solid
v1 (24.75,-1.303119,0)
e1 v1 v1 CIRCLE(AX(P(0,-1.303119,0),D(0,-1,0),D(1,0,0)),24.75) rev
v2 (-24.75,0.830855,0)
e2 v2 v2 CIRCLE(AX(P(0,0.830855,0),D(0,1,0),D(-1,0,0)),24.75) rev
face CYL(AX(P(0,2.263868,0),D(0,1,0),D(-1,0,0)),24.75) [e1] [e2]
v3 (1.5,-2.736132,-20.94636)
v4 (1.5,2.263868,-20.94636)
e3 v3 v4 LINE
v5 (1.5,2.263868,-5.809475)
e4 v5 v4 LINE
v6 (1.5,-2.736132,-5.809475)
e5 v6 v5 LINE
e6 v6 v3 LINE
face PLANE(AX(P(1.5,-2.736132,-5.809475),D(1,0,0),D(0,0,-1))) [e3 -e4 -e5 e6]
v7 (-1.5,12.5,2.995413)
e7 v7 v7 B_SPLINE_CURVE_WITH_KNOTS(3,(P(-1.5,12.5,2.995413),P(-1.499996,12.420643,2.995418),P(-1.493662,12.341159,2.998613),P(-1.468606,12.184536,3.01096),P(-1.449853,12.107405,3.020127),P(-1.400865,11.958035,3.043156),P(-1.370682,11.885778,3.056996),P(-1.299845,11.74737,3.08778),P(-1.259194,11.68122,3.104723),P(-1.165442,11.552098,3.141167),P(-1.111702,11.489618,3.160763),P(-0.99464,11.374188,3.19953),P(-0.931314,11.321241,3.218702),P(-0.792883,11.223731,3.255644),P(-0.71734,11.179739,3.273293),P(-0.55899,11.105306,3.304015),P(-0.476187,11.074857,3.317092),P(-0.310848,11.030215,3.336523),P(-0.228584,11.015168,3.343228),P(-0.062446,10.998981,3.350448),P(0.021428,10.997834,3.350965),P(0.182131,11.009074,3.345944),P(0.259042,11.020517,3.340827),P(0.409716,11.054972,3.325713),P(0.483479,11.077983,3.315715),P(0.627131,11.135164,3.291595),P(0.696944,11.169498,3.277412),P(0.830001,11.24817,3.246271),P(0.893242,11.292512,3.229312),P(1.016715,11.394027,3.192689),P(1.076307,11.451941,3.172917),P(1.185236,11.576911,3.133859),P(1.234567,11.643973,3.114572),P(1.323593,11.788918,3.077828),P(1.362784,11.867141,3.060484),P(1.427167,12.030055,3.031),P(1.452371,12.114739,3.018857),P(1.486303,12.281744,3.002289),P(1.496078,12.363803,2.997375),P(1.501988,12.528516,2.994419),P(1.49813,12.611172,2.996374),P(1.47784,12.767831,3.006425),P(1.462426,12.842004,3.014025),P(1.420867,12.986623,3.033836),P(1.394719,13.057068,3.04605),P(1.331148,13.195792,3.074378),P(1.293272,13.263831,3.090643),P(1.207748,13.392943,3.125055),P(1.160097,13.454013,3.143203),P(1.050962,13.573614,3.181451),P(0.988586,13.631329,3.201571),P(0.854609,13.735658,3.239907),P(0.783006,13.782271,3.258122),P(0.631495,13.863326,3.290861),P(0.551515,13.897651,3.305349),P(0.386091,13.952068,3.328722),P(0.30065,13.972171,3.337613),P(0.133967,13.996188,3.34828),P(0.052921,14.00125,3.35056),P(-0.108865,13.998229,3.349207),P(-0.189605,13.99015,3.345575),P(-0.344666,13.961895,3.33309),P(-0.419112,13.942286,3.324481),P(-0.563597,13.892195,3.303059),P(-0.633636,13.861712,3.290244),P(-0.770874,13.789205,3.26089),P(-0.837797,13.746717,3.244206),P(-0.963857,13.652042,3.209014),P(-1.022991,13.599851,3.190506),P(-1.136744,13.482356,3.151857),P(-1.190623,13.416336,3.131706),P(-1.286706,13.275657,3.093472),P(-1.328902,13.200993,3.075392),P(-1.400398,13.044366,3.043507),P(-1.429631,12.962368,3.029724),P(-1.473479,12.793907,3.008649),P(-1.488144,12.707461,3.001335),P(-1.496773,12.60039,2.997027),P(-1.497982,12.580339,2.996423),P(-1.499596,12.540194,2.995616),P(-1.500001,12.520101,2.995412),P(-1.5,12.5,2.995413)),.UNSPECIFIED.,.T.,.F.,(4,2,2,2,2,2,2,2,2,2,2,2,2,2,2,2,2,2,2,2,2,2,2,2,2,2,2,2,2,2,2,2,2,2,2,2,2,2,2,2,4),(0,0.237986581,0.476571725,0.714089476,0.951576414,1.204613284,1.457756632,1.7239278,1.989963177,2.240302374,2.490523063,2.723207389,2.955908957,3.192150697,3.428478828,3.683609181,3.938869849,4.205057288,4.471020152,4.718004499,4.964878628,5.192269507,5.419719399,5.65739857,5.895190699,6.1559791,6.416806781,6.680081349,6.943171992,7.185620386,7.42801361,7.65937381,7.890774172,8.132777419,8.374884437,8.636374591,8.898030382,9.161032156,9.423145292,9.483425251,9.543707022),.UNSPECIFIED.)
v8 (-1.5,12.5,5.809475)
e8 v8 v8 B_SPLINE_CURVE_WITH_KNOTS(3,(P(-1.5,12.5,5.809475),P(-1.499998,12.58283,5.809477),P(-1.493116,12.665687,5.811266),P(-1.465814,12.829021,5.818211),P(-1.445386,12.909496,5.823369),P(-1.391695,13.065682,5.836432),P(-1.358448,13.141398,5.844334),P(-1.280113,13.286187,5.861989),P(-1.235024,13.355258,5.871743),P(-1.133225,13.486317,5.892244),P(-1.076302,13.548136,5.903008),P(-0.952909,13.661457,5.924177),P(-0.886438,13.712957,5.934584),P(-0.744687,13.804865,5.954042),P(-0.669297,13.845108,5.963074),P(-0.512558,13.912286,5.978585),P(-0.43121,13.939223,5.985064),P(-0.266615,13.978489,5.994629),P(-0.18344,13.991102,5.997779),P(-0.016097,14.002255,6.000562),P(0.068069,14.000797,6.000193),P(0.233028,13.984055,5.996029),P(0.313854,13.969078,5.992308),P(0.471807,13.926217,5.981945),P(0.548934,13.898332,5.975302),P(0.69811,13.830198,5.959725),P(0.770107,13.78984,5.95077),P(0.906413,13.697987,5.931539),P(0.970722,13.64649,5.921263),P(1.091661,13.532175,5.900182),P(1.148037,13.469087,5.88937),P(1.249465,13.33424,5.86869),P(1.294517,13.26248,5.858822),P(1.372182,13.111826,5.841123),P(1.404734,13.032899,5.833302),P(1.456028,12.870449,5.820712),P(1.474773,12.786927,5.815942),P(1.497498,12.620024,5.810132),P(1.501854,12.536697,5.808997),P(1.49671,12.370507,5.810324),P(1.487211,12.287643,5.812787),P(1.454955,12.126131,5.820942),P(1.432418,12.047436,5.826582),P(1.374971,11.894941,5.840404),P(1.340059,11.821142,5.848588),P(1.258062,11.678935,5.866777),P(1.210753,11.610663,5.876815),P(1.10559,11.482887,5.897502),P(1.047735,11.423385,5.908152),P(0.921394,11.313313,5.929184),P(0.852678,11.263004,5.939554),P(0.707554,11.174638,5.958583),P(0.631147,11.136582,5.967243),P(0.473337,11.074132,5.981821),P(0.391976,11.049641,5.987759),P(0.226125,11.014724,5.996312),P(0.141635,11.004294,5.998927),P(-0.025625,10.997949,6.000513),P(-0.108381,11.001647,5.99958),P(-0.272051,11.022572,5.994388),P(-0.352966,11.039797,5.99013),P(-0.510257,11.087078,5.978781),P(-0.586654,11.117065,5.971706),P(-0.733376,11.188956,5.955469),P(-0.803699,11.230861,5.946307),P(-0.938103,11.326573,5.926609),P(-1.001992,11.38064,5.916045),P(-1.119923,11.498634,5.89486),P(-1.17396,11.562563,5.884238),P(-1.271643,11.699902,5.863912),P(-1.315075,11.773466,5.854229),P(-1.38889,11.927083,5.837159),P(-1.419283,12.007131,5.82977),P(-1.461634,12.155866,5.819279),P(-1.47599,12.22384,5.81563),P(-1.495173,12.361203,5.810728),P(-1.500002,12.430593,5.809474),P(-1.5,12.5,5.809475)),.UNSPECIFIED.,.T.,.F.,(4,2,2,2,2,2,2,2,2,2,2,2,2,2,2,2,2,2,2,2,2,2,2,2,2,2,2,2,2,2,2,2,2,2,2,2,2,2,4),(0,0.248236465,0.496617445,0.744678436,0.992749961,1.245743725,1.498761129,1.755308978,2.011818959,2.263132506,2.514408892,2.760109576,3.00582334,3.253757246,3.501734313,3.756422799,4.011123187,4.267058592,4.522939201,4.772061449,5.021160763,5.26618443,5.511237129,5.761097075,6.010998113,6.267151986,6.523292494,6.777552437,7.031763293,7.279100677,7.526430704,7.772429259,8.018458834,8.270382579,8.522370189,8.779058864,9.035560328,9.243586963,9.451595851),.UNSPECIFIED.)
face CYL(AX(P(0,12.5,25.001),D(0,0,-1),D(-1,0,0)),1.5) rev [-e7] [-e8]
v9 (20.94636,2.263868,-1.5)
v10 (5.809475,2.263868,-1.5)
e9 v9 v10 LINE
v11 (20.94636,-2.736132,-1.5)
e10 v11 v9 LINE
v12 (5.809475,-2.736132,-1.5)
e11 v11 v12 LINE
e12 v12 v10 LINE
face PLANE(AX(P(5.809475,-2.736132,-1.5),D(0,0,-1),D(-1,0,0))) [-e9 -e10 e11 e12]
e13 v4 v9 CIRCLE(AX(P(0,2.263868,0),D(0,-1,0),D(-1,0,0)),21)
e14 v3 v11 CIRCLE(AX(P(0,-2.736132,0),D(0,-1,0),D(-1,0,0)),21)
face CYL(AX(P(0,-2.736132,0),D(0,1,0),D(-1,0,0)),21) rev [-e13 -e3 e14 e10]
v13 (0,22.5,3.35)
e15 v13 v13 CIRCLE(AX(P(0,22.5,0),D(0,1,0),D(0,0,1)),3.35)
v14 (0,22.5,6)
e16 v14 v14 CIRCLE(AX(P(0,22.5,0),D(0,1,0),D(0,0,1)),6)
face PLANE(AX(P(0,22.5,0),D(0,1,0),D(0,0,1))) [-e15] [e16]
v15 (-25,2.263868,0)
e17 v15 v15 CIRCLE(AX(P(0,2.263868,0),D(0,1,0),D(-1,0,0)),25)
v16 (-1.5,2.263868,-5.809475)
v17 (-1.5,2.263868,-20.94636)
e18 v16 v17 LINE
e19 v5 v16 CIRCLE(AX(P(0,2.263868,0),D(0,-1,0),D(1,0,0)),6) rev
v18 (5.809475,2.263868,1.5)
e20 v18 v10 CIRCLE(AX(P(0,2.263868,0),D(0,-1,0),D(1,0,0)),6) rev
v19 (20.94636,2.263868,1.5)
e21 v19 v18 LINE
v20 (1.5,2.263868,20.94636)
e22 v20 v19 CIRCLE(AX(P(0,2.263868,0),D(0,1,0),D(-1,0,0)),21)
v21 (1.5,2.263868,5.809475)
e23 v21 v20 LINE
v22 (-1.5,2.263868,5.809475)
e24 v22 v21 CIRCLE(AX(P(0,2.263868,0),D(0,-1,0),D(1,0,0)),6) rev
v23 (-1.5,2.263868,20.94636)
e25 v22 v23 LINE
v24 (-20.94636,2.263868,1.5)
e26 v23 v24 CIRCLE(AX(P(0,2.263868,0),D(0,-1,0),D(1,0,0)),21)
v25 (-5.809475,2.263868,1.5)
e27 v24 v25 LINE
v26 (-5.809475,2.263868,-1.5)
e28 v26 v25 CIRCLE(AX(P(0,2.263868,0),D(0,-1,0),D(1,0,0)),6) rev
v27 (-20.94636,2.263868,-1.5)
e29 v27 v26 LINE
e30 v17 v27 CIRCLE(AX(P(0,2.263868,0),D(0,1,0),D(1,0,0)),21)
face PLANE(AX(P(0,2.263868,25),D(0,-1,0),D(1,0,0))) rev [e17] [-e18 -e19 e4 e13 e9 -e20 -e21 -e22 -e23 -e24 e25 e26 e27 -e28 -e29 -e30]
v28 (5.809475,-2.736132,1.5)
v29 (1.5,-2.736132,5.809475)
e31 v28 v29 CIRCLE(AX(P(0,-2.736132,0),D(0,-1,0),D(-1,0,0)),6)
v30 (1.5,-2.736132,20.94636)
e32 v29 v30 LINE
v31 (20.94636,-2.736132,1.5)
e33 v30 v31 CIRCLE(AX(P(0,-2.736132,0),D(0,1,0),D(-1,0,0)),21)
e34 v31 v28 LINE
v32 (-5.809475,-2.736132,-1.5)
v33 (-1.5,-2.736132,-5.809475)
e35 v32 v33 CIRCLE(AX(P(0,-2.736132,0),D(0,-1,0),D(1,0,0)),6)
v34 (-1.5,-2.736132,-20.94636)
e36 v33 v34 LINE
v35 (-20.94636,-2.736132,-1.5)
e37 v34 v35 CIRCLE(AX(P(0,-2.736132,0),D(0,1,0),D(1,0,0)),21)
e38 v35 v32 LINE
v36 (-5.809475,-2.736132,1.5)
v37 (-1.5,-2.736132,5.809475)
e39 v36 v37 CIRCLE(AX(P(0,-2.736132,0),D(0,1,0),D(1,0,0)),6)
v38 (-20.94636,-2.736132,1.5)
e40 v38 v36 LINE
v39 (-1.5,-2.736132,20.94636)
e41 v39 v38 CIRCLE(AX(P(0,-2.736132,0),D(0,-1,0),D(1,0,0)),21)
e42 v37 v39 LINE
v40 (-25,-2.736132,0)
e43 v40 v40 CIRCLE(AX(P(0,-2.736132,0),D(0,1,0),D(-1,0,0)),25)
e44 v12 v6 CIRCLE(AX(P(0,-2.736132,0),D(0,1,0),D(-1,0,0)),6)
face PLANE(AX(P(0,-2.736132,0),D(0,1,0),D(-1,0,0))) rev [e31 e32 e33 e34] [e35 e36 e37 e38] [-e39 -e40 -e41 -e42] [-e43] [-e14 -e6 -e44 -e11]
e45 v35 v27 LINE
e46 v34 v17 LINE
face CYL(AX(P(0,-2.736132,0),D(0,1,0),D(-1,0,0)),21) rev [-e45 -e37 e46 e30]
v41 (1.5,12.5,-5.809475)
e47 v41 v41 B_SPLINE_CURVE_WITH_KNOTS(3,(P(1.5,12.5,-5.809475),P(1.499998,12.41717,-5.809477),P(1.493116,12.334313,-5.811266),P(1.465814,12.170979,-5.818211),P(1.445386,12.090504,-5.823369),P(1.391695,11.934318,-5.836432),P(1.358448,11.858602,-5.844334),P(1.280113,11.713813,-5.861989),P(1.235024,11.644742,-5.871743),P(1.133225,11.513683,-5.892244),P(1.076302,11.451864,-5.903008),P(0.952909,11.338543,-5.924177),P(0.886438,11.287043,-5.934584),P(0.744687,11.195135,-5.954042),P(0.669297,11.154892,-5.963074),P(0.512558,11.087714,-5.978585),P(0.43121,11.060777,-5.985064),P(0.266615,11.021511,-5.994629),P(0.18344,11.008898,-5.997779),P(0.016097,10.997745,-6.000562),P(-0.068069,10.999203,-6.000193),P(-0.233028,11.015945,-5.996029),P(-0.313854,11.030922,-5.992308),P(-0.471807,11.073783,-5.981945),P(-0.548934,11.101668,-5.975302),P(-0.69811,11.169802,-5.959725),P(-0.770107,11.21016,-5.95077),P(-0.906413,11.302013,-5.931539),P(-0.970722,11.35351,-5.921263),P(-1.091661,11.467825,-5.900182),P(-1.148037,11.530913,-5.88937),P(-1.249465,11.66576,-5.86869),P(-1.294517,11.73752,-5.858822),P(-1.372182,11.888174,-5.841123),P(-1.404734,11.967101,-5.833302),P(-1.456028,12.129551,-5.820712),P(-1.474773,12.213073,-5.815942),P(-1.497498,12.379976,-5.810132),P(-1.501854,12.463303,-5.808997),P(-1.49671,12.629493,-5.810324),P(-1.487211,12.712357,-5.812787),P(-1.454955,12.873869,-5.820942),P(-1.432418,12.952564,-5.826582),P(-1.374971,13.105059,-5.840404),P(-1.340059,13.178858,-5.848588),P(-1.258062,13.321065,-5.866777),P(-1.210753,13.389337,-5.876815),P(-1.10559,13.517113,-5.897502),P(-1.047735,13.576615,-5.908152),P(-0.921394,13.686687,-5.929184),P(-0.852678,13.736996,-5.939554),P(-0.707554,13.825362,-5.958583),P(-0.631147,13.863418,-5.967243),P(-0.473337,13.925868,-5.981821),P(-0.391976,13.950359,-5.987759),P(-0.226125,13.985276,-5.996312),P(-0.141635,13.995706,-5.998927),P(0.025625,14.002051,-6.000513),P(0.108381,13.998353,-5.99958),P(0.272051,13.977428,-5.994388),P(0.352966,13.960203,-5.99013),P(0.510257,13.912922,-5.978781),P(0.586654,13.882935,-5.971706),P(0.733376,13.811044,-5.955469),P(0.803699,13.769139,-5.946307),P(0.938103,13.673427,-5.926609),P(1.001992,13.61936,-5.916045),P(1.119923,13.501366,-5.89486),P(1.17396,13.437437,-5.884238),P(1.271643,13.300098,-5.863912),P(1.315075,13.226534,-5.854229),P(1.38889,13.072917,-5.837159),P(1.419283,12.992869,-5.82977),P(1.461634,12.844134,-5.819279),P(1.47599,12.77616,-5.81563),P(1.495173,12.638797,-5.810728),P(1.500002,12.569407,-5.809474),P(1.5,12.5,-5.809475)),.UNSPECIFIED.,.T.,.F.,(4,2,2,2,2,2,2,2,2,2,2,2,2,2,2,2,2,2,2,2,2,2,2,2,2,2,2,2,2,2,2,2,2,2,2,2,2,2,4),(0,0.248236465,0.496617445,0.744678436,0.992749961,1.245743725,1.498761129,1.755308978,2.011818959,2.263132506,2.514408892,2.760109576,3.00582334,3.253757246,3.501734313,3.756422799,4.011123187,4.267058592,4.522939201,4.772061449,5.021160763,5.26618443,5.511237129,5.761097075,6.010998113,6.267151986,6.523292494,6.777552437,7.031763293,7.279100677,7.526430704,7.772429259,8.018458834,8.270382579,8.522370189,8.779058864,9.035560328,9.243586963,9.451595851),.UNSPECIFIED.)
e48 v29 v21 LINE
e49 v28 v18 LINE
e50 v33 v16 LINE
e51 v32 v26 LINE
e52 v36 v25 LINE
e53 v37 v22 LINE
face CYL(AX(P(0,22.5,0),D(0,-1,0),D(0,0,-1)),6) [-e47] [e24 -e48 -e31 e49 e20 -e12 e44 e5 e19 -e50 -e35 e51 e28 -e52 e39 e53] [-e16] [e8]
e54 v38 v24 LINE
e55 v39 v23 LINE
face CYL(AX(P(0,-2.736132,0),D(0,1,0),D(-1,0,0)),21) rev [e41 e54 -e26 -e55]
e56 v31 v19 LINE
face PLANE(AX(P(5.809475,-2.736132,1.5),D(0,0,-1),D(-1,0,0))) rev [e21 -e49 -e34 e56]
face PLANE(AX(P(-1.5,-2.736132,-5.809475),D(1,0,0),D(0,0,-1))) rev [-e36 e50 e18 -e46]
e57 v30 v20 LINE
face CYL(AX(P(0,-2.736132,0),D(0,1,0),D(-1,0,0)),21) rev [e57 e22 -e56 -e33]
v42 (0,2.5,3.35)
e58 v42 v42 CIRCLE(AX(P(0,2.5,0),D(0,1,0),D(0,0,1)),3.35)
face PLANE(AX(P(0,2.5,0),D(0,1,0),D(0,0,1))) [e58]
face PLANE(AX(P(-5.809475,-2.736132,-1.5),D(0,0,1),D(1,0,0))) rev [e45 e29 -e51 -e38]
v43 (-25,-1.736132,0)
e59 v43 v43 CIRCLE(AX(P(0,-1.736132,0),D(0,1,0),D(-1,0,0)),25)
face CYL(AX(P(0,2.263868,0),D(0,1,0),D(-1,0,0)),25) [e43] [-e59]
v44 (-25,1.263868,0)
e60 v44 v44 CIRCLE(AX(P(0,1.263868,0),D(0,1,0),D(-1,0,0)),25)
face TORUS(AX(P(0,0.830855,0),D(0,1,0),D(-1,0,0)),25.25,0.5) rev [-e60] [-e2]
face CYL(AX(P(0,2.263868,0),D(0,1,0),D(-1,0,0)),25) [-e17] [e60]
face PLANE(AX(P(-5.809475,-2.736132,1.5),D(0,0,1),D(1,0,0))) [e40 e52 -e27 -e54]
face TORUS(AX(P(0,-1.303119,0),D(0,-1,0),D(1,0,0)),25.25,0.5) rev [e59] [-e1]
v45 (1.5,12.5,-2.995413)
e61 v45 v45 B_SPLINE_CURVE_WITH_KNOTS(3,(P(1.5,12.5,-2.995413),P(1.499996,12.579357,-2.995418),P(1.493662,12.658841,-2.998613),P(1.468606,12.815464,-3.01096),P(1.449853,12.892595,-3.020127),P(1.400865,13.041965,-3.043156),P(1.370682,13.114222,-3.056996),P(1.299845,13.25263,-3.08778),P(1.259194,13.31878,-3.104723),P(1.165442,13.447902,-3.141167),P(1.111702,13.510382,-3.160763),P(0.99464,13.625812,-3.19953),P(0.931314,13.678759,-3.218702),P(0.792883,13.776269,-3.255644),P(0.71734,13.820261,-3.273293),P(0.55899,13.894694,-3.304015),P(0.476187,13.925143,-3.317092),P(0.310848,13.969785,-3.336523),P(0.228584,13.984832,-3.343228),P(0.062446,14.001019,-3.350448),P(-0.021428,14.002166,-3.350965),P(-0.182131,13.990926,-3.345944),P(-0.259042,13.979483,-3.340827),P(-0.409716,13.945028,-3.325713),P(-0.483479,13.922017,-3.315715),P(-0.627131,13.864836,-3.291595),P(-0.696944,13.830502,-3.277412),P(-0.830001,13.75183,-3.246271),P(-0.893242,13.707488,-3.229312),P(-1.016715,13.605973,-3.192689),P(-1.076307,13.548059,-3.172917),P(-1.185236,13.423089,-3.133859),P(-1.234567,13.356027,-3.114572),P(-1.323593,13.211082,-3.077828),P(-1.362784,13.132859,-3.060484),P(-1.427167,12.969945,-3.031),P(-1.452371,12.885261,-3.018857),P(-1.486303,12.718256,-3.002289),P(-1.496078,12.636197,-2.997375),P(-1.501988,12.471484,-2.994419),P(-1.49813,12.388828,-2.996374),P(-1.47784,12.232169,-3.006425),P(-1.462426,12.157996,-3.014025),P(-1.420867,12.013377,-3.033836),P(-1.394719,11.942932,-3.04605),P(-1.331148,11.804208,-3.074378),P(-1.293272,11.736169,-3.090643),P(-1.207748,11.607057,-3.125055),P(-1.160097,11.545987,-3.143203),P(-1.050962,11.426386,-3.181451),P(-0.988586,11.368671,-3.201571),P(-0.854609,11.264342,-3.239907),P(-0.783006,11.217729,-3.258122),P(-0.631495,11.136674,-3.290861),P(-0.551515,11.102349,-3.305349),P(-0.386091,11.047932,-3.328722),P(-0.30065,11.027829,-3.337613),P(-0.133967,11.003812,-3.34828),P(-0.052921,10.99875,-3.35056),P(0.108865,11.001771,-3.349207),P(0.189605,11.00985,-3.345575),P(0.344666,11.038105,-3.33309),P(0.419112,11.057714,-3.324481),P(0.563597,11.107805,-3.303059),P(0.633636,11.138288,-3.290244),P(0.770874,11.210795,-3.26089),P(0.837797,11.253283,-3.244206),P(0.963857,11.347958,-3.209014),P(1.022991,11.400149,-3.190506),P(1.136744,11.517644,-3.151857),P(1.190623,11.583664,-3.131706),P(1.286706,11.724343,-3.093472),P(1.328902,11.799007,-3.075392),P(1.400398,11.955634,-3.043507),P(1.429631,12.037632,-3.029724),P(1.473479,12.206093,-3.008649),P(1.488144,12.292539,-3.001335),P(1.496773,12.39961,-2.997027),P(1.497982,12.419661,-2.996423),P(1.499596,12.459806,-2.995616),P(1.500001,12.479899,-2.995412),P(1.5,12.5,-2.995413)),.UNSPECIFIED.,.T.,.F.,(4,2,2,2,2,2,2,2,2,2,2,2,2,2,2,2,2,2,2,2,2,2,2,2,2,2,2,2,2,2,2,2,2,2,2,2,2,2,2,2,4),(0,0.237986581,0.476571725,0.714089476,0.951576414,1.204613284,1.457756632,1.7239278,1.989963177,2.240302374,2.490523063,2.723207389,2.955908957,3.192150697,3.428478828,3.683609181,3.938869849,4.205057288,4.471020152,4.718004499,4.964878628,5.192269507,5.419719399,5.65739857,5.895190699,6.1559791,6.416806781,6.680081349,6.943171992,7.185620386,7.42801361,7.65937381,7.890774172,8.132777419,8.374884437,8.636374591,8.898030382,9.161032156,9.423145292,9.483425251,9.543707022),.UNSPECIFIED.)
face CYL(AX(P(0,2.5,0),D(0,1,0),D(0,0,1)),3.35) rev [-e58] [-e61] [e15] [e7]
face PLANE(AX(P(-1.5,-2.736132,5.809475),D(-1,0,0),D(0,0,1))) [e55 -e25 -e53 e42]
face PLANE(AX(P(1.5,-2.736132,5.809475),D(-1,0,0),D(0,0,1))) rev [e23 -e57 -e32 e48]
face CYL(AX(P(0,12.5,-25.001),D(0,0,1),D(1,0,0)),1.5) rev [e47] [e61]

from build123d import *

# Parameters (mm, degrees)
REVOLVE1_ANGLE                 = 90.0000000000002
BOSS_EXTRUDE2_DEPTH            = 22.5
CUT_EXTRUDE1_DEPTH             = 41.736973886583954
MIRROR3_START                  = -2.736132077
MIRROR3_DEPTH                  = 5
MIRROR3_START_2                = 2.263867923
MIRROR3_2_DEPTH                = 20.236132077
MIRROR3_3_DEPTH                = 1
MIRROR3_START_3                = 1.263867923
MIRROR3_4_DEPTH                = 1
MIRROR4_START                  = -2.736132077
MIRROR4_DEPTH                  = 5
MIRROR4_START_2                = 2.263867923
MIRROR4_2_DEPTH                = 20.236132077
MIRROR4_3_DEPTH                = 1
MIRROR4_START_3                = 1.263867923
MIRROR4_4_DEPTH                = 1
SKETCH7_R                      = 3.35
CUT_EXTRUDE2_DEPTH             = 20
FILLET9_R                      = 0.5
CUT_EXTRUDE3_REACH             = 43.908
SKETCH8_R                      = 1.5000000000000004
CUT_EXTRUDE3_DIRECTION_2_REACH = 43.908


# Read off the part's stored shape, not the designer's step: Mirror3, Mirror4
with BuildPart() as part:
    # Sketch1 → Revolve1 (revolve)
    with BuildSketch(Plane.XY):
        Polygon((0, 2.2638679230386933), (0, -2.7361320769613027), (25, -2.7361320769613027), (25.000000000000007, -1.736132076961303), (24.750000000000007, -1.736132076961303), (24.75, 1.2638679230386973), (25, 1.2638679230386973), (25, 2.2638679230386973), align=None)
    revolve(axis=Axis((0, 2.2638679230386933, 0), (0, -1, 0)), revolution_arc=REVOLVE1_ANGLE)

    # Sketch2 → Boss-Extrude2 (add)
    with BuildSketch(Plane(origin=(0, 0, 0), x_dir=(1, 0, 0), z_dir=(0, 1, 0))):
        with BuildLine():
            Line((0, 0), (6, 0))
            ThreePointArc((6, 0), (4.242640687119239, -4.242640687119332), (-1.3093e-13, -6))
            Line((-1.3093e-13, -6), (0, 0))
        make_face()
    extrude(amount=BOSS_EXTRUDE2_DEPTH)

    # Sketch6 → Cut-Extrude1 (cut, through all)
    with BuildSketch(Plane(origin=(0, 2.263867923038695, 0), x_dir=(1, 0, 0), z_dir=(0, 1, 0))):
        with BuildLine():
            Line((1.4999999999999127, -5.809475019311148), (1.4999999999999145, -20.946360065653423))
            ThreePointArc((1.4999999999999145, -20.946360065653423), (14.849242404917469, -14.849242404917533), (20.946360065653415, -1.5))
            Line((20.946360065653415, -1.5), (5.809475019311125, -1.5))
            ThreePointArc((5.809475019311125, -1.5), (4.242640687119254, -4.242640687119317), (1.4999999999999127, -5.809475019311148))
        make_face()
    extrude(amount=-CUT_EXTRUDE1_DEPTH, mode=Mode.SUBTRACT)

    # Mirror3 outline → Mirror3 (add)
    with BuildSketch(Plane(origin=(0, 0, 0), x_dir=(1, 0, 0), z_dir=(0, 1, 0)).offset(MIRROR3_START)):
        with BuildLine():
            ThreePointArc((24.75, 0), (17.500892834, 17.500892834), (0, 24.75))
            Line((0, 24.75), (0, 0))
            Line((0, 0), (24.75, 0))
        make_face()
        with BuildLine():
            Line((20.946360066, 1.5), (5.809475019, 1.5))
            ThreePointArc((5.809475019, 1.5), (4.242640687, 4.242640687), (1.5, 5.809475019))
            Line((1.5, 5.809475019), (1.5, 20.946360066))
            ThreePointArc((1.5, 20.946360066), (14.849242405, 14.849242405), (20.946360066, 1.5))
        make_face(mode=Mode.SUBTRACT)
    extrude(amount=MIRROR3_DEPTH)

    # Mirror3 2 outline → Mirror3 2 (add)
    with BuildSketch(Plane(origin=(0, 0, 0), x_dir=(1, 0, 0), z_dir=(0, 1, 0)).offset(MIRROR3_START_2)):
        with BuildLine():
            Line((0, 0), (6, 0))
            ThreePointArc((6, 0), (4.242640687, 4.242640687), (0, 6))
            Line((0, 6), (0, 0))
        make_face()
    extrude(amount=MIRROR3_2_DEPTH)

    # Mirror3 3 outline → Mirror3 3 (add)
    with BuildSketch(Plane(origin=(0, 0, 0), x_dir=(1, 0, 0), z_dir=(0, 1, 0)).offset(MIRROR3_START)):
        with BuildLine():
            Line((24.75, 0), (25, 0))
            ThreePointArc((25, 0), (17.67766953, 17.67766953), (0, 25))
            Line((0, 25), (0, 24.75))
            ThreePointArc((0, 24.75), (17.500892834, 17.500892834), (24.75, 0))
        make_face()
    extrude(amount=MIRROR3_3_DEPTH)

    # Mirror3 4 outline → Mirror3 4 (add)
    with BuildSketch(Plane(origin=(0, 0, 0), x_dir=(1, 0, 0), z_dir=(0, 1, 0)).offset(MIRROR3_START_3)):
        with BuildLine():
            Line((24.75, 0), (25, 0))
            ThreePointArc((25, 0), (17.67766953, 17.67766953), (0, 25))
            Line((0, 25), (0, 24.75))
            ThreePointArc((0, 24.75), (17.500892834, 17.500892834), (24.75, 0))
        make_face()
    extrude(amount=MIRROR3_4_DEPTH)

    # Mirror4 outline → Mirror4 (add)
    with BuildSketch(Plane(origin=(0, 0, 0), x_dir=(1, 0, 0), z_dir=(0, 1, 0)).offset(MIRROR4_START)):
        with BuildLine():
            ThreePointArc((0, 24.75), (-24.75, 0), (0, -24.75))
            Line((0, -24.75), (0, 24.75))
        make_face()
        with BuildLine():
            Line((-1.5, 20.946360066), (-1.5, 5.809475019))
            ThreePointArc((-1.5, 5.809475019), (-4.242640687, 4.242640687), (-5.809475019, 1.5))
            Line((-5.809475019, 1.5), (-20.946360066, 1.5))
            ThreePointArc((-20.946360066, 1.5), (-14.849242405, 14.849242405), (-1.5, 20.946360066))
        make_face(mode=Mode.SUBTRACT)
        with BuildLine():
            Line((-20.946360066, -1.5), (-5.809475019, -1.5))
            ThreePointArc((-5.809475019, -1.5), (-4.242640687, -4.242640687), (-1.5, -5.809475019))
            Line((-1.5, -5.809475019), (-1.5, -20.946360066))
            ThreePointArc((-1.5, -20.946360066), (-14.849242405, -14.849242405), (-20.946360066, -1.5))
        make_face(mode=Mode.SUBTRACT)
    extrude(amount=MIRROR4_DEPTH)

    # Mirror4 2 outline → Mirror4 2 (add)
    with BuildSketch(Plane(origin=(0, 0, 0), x_dir=(1, 0, 0), z_dir=(0, 1, 0)).offset(MIRROR4_START_2)):
        with BuildLine():
            Line((0, -6), (0, 6))
            ThreePointArc((0, 6), (-6, 0), (0, -6))
        make_face()
    extrude(amount=MIRROR4_2_DEPTH)

    # Mirror4 3 outline → Mirror4 3 (add)
    with BuildSketch(Plane(origin=(0, 0, 0), x_dir=(1, 0, 0), z_dir=(0, 1, 0)).offset(MIRROR4_START)):
        with BuildLine():
            Line((0, 24.75), (0, 25))
            ThreePointArc((0, 25), (-25, 0), (0, -25))
            Line((0, -25), (0, -24.75))
            ThreePointArc((0, -24.75), (-24.75, 0), (0, 24.75))
        make_face()
    extrude(amount=MIRROR4_3_DEPTH)

    # Mirror4 4 outline → Mirror4 4 (add)
    with BuildSketch(Plane(origin=(0, 0, 0), x_dir=(1, 0, 0), z_dir=(0, 1, 0)).offset(MIRROR4_START_3)):
        with BuildLine():
            Line((0, 24.75), (0, 25))
            ThreePointArc((0, 25), (-25, 0), (0, -25))
            Line((0, -25), (0, -24.75))
            ThreePointArc((0, -24.75), (-24.75, 0), (0, 24.75))
        make_face()
    extrude(amount=MIRROR4_4_DEPTH)

    # Sketch7 → Cut-Extrude2 (cut)
    with BuildSketch(Plane(origin=(0, 22.5, 0), x_dir=(1, 0, 0), z_dir=(0, 1, 0))):
        with Locations(Location((0, 0, 0), (0, 0, 270))):
            Circle(SKETCH7_R)
    extrude(amount=-CUT_EXTRUDE2_DEPTH, mode=Mode.SUBTRACT)

    # Fillet9
    # the kernel refuses this fillet: 0.5 mm, written as the material it adds along each edge
    with BuildSketch(Plane(origin=(3.55e-15, 1.263867923, 0), x_dir=(-1.4e-16, 0, 1), z_dir=(1, 0, 1.4e-16))) as fillet9_piece_1:
        with BuildLine():
            CenterArc((25.25, 0.4330127018922456), FILLET9_R, 180, 60.000000000001876)
            Line((25.000000000000014, 1.821e-14), (24.995000000000015, -0.00866025403782644))
            ThreePointArc((24.995000000000015, -0.00866025403782644), (24.875000000000007, -0.01000000000000001), (24.75, -0.01000000000000001))
            Line((24.75, -0.01000000000000001), (24.74, 0))
            Line((24.74, 0), (24.74, 0.4330127018922456))
            Line((24.74, 0.4330127018922456), (24.75, 0.4330127018922456))
        make_face()
    revolve(axis=Axis((3.55e-15, 1.263867923, 0), (0, -1, 0)), revolution_arc=179.99999999999997)
    with BuildSketch(Plane(origin=(3.55e-15, -1.7361320770000002, 0), x_dir=(-1.4e-16, 0, 1), z_dir=(1, 0, 1.4e-16))) as fillet9_piece_2:
        with BuildLine():
            CenterArc((25.25, -0.4330127018922456), FILLET9_R, 119.99999999999814, 60.00000000000186)
            Line((24.75, -0.4330127018922456), (24.74, -0.4330127018922456))
            Line((24.74, -0.4330127018922456), (24.74, 0))
            Line((24.74, 0), (24.75, 0.01000000000000001))
            ThreePointArc((24.75, 0.01000000000000001), (24.875000000000007, 0.01000000000000001), (24.995000000000015, 0.00866025403782644))
            Line((24.995000000000015, 0.00866025403782644), (25.000000000000014, -1.821e-14))
        make_face()
    revolve(axis=Axis((3.55e-15, -1.7361320770000002, 0), (0, -1, 0)), revolution_arc=179.99999999999997)
    with BuildSketch(Plane(origin=(0, -1.7361320769613031, 0), x_dir=(1, 0, 0), z_dir=(0, 0, -1))) as fillet9_piece_3:
        with BuildLine():
            CenterArc((25.250000000000007, -0.4330127018922436), FILLET9_R, 119.9999999999986, 60.00000000000141)
            Line((24.750000000000007, -0.4330127018922436), (24.740000000000006, -0.4330127018922436))
            Line((24.740000000000006, -0.4330127018922436), (24.740000000000006, 0))
            Line((24.740000000000006, 0), (24.750000000000007, 0.01000000000000001))
            ThreePointArc((24.750000000000007, 0.01000000000000001), (24.875000000000014, 0.01000000000000001), (24.99500000000002, 0.00866025403782622))
            Line((24.99500000000002, 0.00866025403782622), (25.000000000000018, -1.821e-14))
        make_face()
    revolve(axis=Axis((0, -1.7361320769613031, 0), (0, -1, 0)), revolution_arc=90.0000000000002)
    with BuildSketch(Plane(origin=(-1.25320021e-09, -1.7361320770000002, 1.25320021e-09), x_dir=(5.063435192760357e-11, 0, -1.0), z_dir=(-1.0, 0, -5.063435192760357e-11))) as fillet9_piece_4:
        with BuildLine():
            CenterArc((25.2500000012532, -0.4330127018922456), FILLET9_R, 119.99999999999814, 60.00000000000186)
            Line((24.7500000012532, -0.4330127018922456), (24.7400000012532, -0.4330127018922456))
            Line((24.7400000012532, -0.4330127018922456), (24.7400000012532, 0))
            Line((24.7400000012532, 0), (24.7500000012532, 0.01000000000000001))
            ThreePointArc((24.7500000012532, 0.01000000000000001), (24.875000001253206, 0.01000000000000001), (24.995000001253217, 0.00866025403782644))
            Line((24.995000001253217, 0.00866025403782644), (25.000000001253213, -1.821e-14))
        make_face()
    revolve(axis=Axis((-1.25320021e-09, -1.7361320770000002, 1.25320021e-09), (0, -1, 0)), revolution_arc=89.99999999419774)
    with BuildSketch(Plane(origin=(0, 1.2638679230386973, 0), x_dir=(1, 0, 0), z_dir=(0, 0, -1))) as fillet9_piece_5:
        with BuildLine():
            CenterArc((25.250000000000007, 0.4330127018922396), FILLET9_R, 180, 60.000000000000455)
            Line((25.00000000000001, 1.821e-14), (24.99500000000001, -0.00866025403782622))
            ThreePointArc((24.99500000000001, -0.00866025403782622), (24.875000000000007, -0.01000000000000001), (24.75, -0.01000000000000001))
            Line((24.75, -0.01000000000000001), (24.74, 0))
            Line((24.74, 0), (24.740000000000006, 0.4330127018922396))
            Line((24.740000000000006, 0.4330127018922396), (24.750000000000007, 0.4330127018922396))
        make_face()
    revolve(axis=Axis((0, 1.2638679230386973, 0), (0, -1, 0)), revolution_arc=90.0000000000002)
    with BuildSketch(Plane(origin=(-1.25320021e-09, 1.263867923, 1.25320021e-09), x_dir=(5.063435192760357e-11, 0, -1.0), z_dir=(-1.0, 0, -5.063435192760357e-11))) as fillet9_piece_6:
        with BuildLine():
            CenterArc((25.2500000012532, 0.4330127018922456), FILLET9_R, 180, 60.000000000001876)
            Line((25.000000001253213, 1.821e-14), (24.995000001253217, -0.00866025403782644))
            ThreePointArc((24.995000001253217, -0.00866025403782644), (24.875000001253206, -0.01000000000000001), (24.7500000012532, -0.01000000000000001))
            Line((24.7500000012532, -0.01000000000000001), (24.7400000012532, 0))
            Line((24.7400000012532, 0), (24.7400000012532, 0.4330127018922456))
            Line((24.7400000012532, 0.4330127018922456), (24.7500000012532, 0.4330127018922456))
        make_face()
    revolve(axis=Axis((-1.25320021e-09, 1.263867923, 1.25320021e-09), (0, -1, 0)), revolution_arc=89.99999999419774)

    # Sketch8 → Cut-Extrude3 (cut, up to next)
    with BuildSketch(Plane.XY, mode=Mode.PRIVATE) as cut_extrude3_sk1:
        with Locations(Location((1.22e-15, 12.499999999999998, 0), (0, 0, 180))):
            Circle(SKETCH8_R)
    cut_extrude3_tool1 = extrude(cut_extrude3_sk1.sketch, amount=CUT_EXTRUDE3_REACH, mode=Mode.PRIVATE) & part.part
    add(cut_extrude3_tool1.solids().sort_by_distance((0, 12.5, 0))[0], mode=Mode.SUBTRACT)

    # Sketch8 → Cut-Extrude3 direction 2 (cut, up to next)
    with BuildSketch(Plane.XY, mode=Mode.PRIVATE) as cut_extrude3_direction_2_sk1:
        with Locations(Location((1.22e-15, 12.499999999999998, 0), (0, 0, 180))):
            Circle(SKETCH8_R)
    cut_extrude3_direction_2_tool1 = extrude(cut_extrude3_direction_2_sk1.sketch, amount=-CUT_EXTRUDE3_DIRECTION_2_REACH, mode=Mode.PRIVATE) & part.part
    add(cut_extrude3_direction_2_tool1.solids().sort_by_distance((0, 12.5, 0))[0], mode=Mode.SUBTRACT)


solid = part.part
